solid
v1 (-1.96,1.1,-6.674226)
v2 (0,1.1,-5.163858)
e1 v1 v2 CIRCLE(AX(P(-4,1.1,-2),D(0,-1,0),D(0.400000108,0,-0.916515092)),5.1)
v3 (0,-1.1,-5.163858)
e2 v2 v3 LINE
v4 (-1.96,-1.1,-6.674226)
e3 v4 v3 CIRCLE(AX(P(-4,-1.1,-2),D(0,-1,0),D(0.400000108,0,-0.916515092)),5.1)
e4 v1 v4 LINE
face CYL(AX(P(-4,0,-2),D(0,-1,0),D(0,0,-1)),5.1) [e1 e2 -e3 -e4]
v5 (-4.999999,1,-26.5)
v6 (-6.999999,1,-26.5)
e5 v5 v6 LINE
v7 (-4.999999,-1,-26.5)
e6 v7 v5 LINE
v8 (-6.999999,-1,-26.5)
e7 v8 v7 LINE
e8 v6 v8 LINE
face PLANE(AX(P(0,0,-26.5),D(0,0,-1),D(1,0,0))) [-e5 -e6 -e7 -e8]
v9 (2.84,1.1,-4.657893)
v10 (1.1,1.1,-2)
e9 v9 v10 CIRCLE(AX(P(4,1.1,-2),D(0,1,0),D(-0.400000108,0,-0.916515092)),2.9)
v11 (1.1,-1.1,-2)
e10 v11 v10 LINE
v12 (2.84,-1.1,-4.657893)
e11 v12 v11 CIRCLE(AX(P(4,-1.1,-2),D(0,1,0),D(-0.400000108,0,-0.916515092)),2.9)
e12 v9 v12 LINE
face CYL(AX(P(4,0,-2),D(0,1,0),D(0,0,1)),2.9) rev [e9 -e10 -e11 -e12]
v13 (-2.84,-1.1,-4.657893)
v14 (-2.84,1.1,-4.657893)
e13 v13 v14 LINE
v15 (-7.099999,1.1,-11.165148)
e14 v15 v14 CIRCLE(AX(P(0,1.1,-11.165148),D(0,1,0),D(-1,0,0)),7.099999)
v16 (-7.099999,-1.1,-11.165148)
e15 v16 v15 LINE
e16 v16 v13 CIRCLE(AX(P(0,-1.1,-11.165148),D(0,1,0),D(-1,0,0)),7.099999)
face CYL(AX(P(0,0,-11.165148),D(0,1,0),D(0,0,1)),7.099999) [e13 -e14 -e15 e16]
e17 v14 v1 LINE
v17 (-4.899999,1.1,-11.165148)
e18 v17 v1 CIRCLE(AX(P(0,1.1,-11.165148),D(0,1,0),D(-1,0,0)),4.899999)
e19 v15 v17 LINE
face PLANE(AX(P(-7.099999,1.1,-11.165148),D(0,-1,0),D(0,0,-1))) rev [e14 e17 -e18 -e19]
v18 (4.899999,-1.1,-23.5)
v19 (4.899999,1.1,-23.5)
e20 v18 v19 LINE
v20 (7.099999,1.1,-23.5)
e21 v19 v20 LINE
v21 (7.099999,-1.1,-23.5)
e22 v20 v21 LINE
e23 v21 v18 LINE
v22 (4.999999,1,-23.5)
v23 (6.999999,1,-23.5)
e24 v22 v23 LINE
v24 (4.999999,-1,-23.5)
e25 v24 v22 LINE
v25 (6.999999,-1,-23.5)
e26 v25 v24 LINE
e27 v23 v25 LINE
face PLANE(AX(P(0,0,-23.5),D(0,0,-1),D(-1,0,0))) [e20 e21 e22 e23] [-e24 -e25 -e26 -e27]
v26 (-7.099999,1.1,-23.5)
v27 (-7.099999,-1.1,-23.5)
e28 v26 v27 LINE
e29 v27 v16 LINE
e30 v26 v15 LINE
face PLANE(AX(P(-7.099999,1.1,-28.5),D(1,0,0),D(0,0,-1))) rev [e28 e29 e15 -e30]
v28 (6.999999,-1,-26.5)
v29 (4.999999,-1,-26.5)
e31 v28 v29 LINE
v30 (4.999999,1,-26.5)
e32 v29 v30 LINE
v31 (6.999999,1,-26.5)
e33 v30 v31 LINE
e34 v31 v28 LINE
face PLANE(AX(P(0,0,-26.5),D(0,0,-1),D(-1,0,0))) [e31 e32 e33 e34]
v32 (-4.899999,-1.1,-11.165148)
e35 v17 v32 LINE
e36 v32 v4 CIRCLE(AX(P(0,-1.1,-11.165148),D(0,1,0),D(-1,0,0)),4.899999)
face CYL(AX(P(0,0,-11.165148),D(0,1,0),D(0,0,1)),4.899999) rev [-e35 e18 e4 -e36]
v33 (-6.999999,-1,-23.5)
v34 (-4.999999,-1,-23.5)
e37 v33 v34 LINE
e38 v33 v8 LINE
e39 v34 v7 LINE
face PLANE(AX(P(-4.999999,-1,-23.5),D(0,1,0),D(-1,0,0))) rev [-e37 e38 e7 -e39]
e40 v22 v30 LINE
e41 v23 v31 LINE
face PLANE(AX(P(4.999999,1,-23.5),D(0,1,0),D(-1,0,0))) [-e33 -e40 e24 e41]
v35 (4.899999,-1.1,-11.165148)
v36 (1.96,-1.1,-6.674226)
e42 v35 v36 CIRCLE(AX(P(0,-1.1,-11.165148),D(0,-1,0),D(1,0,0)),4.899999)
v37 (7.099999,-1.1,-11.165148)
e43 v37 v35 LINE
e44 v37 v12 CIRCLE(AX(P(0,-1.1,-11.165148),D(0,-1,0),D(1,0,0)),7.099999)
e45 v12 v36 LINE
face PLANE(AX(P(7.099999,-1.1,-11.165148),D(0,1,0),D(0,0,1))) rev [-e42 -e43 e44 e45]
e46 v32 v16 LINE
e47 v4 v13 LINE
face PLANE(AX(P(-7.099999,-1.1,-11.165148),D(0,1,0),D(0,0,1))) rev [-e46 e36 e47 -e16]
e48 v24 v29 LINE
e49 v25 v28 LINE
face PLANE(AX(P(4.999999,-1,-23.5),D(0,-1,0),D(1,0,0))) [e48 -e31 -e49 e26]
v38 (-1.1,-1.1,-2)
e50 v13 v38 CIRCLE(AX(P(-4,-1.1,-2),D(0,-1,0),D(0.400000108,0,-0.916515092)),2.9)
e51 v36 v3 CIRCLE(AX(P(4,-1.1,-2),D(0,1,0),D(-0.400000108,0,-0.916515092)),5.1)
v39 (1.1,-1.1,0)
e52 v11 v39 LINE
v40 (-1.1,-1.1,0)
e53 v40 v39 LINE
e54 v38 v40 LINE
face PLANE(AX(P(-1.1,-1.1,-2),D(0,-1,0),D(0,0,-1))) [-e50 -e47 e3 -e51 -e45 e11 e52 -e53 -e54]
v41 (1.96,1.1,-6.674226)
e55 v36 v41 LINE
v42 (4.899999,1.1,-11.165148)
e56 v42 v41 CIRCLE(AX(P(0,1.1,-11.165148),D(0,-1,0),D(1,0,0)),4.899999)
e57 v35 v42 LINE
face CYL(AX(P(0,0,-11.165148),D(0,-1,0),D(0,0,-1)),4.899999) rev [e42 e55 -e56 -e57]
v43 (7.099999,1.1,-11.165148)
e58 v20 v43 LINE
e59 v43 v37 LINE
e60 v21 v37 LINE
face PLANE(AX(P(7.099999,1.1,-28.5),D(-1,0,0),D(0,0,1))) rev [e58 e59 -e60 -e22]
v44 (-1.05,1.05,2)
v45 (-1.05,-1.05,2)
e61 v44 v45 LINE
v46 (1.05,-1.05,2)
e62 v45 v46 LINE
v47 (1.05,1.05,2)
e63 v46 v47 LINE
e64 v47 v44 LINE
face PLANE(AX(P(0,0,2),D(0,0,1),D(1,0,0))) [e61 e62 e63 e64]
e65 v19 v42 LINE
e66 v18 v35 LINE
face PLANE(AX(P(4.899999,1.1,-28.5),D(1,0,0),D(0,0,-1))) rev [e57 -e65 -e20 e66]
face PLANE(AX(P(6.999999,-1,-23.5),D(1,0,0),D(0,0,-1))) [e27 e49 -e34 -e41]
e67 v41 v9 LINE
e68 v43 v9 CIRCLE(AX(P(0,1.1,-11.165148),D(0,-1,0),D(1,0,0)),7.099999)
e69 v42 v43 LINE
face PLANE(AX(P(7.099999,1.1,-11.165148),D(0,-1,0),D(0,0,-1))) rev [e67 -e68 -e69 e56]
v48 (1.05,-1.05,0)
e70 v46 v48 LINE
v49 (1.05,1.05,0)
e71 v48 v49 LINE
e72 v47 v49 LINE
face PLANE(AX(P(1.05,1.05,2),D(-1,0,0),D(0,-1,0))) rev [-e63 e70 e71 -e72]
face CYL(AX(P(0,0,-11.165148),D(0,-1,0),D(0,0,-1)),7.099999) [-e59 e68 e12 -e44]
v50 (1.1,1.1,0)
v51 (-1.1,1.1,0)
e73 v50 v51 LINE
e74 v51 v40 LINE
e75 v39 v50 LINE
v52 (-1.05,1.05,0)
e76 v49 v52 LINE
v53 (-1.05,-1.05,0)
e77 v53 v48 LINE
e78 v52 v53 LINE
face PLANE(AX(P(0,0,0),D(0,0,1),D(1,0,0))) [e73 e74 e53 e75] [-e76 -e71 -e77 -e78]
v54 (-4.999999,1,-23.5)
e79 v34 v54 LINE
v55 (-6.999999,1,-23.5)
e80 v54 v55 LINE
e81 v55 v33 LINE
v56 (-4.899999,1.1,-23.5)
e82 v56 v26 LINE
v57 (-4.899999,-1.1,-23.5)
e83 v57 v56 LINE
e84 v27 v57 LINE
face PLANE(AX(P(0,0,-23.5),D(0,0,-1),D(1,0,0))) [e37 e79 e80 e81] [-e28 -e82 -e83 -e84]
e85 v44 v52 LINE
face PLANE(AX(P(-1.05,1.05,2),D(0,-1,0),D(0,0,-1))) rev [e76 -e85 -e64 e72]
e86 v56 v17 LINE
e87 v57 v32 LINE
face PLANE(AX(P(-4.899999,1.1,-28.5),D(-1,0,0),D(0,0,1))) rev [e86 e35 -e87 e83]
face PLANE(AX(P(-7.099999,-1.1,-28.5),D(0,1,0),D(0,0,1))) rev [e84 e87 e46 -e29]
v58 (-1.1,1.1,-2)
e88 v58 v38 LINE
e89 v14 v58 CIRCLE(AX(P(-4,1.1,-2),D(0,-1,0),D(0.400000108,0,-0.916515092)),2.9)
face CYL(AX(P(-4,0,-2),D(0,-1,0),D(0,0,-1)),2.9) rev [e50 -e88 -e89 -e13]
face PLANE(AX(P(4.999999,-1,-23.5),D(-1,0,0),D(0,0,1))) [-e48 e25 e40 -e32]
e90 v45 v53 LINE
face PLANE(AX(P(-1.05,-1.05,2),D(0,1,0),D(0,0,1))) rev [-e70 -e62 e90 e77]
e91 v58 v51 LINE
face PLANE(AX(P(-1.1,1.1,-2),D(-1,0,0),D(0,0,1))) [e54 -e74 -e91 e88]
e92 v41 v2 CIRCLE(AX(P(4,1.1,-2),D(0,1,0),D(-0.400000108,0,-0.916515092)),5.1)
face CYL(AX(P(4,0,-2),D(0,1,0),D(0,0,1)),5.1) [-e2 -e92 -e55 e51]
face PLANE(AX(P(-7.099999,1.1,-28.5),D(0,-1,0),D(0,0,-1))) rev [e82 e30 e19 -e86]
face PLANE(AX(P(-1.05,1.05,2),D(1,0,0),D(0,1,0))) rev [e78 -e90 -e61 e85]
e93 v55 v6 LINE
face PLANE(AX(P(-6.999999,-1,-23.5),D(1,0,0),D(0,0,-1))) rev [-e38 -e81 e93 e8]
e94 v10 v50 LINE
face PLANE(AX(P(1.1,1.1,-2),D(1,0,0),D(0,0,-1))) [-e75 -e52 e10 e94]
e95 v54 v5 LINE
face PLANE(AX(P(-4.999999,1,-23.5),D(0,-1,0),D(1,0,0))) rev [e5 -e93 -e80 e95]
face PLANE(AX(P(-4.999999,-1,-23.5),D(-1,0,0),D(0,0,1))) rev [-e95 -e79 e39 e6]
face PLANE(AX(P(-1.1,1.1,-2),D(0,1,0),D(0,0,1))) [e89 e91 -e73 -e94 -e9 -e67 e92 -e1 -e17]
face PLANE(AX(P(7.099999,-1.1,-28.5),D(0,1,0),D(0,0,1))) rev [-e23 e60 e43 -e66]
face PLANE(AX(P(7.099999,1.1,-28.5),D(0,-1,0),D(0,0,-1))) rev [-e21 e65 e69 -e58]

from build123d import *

# Parameters (mm, degrees)
SKETCH1_W           = 2.1
SKETCH1_H           = 2.1
BOSS_EXTRUDE1_DEPTH = 2
SKETCH4_W           = 2.2
SKETCH4_H           = 2.2
BOSS_EXTRUDE3_DEPTH = 2
SWEEP4_START        = -1.1
SWEEP4_DEPTH        = 2.2
SKETCH8_W           = 2.2
SKETCH8_H           = 2.2
SKETCH8_W_2         = 2
SKETCH8_H_2         = 2
CUT_EXTRUDE2_DEPTH  = 5
SKETCH9_W           = 2
SKETCH9_H           = 2
CUT_EXTRUDE3_DEPTH  = 2


# Read off the part's stored shape, not the designer's step: Sweep4
with BuildPart() as part:
    # Sketch1 → Boss-Extrude1 (new body)
    with BuildSketch(Plane.XY):
        Rectangle(SKETCH1_W, SKETCH1_H)
    extrude(amount=BOSS_EXTRUDE1_DEPTH)

    # Sketch4 → Boss-Extrude3 (add)
    with BuildSketch(Plane.XY):
        Rectangle(SKETCH4_W, SKETCH4_H)
    extrude(amount=-BOSS_EXTRUDE3_DEPTH)

    # Sweep4 outline → Sweep4 (add)
    with BuildSketch(Plane(origin=(0, 0, 0), x_dir=(1, 0, 0), z_dir=(0, 1, 0)).offset(SWEEP4_START)):
        with BuildLine():
            Line((7.09999865, 11.165148445), (7.09999919, 28.5))
            Line((7.09999919, 28.5), (4.89999919, 28.5))
            Line((4.89999919, 28.5), (4.89999865, 11.165148445))
            ThreePointArc((4.89999865, 11.165148445), (4.099633159, 8.481308894), (1.959999989, 6.674225732))
            ThreePointArc((1.959999989, 6.674225732), (-0.2669663, 4.793384792), (-1.1, 2))
            Line((-1.1, 2), (1.1, 2))
            ThreePointArc((1.1, 2), (1.573685829, 3.588395274), (2.839999687, 4.657893766))
            ThreePointArc((2.839999687, 4.657893766), (5.940285288, 7.276319376), (7.09999865, 11.165148445))
        make_face()
    sweep4 = extrude(amount=SWEEP4_DEPTH)

    # Mirror1: Sweep4 across plane
    add(sweep4.mirror(Plane(origin=(0, 0, 0), x_dir=(0, 0, 1), z_dir=(1, 0, 0))))

    # Sketch8 → Cut-Extrude2 (cut)
    with BuildSketch(Plane(origin=(0, 0, -28.5), x_dir=(-1, 0, 0), z_dir=(0, 0, -1))):
        with Locations((-5.99999919, 0)):
            Rectangle(SKETCH8_W, SKETCH8_H)
        with Locations((-5.99999919, 0)):
            Rectangle(SKETCH8_W_2, SKETCH8_H_2, mode=Mode.SUBTRACT)
    cut_extrude2 = extrude(amount=-CUT_EXTRUDE2_DEPTH, mode=Mode.SUBTRACT)

    # Sketch9 → Cut-Extrude3 (cut)
    with BuildSketch(Plane(origin=(0, 0, -28.5), x_dir=(-1, 0, 0), z_dir=(0, 0, -1))):
        with Locations((-5.99999919, 0)):
            Rectangle(SKETCH9_W, SKETCH9_H)
    cut_extrude3 = extrude(amount=-CUT_EXTRUDE3_DEPTH, mode=Mode.SUBTRACT)

    # Mirror2: Cut-Extrude2, Cut-Extrude3 across plane
    add(cut_extrude2.mirror(Plane(origin=(0, 0, 0), x_dir=(0, 0, 1), z_dir=(1, 0, 0))), mode=Mode.SUBTRACT)
    add(cut_extrude3.mirror(Plane(origin=(0, 0, 0), x_dir=(0, 0, 1), z_dir=(1, 0, 0))), mode=Mode.SUBTRACT)


solid = part.part
